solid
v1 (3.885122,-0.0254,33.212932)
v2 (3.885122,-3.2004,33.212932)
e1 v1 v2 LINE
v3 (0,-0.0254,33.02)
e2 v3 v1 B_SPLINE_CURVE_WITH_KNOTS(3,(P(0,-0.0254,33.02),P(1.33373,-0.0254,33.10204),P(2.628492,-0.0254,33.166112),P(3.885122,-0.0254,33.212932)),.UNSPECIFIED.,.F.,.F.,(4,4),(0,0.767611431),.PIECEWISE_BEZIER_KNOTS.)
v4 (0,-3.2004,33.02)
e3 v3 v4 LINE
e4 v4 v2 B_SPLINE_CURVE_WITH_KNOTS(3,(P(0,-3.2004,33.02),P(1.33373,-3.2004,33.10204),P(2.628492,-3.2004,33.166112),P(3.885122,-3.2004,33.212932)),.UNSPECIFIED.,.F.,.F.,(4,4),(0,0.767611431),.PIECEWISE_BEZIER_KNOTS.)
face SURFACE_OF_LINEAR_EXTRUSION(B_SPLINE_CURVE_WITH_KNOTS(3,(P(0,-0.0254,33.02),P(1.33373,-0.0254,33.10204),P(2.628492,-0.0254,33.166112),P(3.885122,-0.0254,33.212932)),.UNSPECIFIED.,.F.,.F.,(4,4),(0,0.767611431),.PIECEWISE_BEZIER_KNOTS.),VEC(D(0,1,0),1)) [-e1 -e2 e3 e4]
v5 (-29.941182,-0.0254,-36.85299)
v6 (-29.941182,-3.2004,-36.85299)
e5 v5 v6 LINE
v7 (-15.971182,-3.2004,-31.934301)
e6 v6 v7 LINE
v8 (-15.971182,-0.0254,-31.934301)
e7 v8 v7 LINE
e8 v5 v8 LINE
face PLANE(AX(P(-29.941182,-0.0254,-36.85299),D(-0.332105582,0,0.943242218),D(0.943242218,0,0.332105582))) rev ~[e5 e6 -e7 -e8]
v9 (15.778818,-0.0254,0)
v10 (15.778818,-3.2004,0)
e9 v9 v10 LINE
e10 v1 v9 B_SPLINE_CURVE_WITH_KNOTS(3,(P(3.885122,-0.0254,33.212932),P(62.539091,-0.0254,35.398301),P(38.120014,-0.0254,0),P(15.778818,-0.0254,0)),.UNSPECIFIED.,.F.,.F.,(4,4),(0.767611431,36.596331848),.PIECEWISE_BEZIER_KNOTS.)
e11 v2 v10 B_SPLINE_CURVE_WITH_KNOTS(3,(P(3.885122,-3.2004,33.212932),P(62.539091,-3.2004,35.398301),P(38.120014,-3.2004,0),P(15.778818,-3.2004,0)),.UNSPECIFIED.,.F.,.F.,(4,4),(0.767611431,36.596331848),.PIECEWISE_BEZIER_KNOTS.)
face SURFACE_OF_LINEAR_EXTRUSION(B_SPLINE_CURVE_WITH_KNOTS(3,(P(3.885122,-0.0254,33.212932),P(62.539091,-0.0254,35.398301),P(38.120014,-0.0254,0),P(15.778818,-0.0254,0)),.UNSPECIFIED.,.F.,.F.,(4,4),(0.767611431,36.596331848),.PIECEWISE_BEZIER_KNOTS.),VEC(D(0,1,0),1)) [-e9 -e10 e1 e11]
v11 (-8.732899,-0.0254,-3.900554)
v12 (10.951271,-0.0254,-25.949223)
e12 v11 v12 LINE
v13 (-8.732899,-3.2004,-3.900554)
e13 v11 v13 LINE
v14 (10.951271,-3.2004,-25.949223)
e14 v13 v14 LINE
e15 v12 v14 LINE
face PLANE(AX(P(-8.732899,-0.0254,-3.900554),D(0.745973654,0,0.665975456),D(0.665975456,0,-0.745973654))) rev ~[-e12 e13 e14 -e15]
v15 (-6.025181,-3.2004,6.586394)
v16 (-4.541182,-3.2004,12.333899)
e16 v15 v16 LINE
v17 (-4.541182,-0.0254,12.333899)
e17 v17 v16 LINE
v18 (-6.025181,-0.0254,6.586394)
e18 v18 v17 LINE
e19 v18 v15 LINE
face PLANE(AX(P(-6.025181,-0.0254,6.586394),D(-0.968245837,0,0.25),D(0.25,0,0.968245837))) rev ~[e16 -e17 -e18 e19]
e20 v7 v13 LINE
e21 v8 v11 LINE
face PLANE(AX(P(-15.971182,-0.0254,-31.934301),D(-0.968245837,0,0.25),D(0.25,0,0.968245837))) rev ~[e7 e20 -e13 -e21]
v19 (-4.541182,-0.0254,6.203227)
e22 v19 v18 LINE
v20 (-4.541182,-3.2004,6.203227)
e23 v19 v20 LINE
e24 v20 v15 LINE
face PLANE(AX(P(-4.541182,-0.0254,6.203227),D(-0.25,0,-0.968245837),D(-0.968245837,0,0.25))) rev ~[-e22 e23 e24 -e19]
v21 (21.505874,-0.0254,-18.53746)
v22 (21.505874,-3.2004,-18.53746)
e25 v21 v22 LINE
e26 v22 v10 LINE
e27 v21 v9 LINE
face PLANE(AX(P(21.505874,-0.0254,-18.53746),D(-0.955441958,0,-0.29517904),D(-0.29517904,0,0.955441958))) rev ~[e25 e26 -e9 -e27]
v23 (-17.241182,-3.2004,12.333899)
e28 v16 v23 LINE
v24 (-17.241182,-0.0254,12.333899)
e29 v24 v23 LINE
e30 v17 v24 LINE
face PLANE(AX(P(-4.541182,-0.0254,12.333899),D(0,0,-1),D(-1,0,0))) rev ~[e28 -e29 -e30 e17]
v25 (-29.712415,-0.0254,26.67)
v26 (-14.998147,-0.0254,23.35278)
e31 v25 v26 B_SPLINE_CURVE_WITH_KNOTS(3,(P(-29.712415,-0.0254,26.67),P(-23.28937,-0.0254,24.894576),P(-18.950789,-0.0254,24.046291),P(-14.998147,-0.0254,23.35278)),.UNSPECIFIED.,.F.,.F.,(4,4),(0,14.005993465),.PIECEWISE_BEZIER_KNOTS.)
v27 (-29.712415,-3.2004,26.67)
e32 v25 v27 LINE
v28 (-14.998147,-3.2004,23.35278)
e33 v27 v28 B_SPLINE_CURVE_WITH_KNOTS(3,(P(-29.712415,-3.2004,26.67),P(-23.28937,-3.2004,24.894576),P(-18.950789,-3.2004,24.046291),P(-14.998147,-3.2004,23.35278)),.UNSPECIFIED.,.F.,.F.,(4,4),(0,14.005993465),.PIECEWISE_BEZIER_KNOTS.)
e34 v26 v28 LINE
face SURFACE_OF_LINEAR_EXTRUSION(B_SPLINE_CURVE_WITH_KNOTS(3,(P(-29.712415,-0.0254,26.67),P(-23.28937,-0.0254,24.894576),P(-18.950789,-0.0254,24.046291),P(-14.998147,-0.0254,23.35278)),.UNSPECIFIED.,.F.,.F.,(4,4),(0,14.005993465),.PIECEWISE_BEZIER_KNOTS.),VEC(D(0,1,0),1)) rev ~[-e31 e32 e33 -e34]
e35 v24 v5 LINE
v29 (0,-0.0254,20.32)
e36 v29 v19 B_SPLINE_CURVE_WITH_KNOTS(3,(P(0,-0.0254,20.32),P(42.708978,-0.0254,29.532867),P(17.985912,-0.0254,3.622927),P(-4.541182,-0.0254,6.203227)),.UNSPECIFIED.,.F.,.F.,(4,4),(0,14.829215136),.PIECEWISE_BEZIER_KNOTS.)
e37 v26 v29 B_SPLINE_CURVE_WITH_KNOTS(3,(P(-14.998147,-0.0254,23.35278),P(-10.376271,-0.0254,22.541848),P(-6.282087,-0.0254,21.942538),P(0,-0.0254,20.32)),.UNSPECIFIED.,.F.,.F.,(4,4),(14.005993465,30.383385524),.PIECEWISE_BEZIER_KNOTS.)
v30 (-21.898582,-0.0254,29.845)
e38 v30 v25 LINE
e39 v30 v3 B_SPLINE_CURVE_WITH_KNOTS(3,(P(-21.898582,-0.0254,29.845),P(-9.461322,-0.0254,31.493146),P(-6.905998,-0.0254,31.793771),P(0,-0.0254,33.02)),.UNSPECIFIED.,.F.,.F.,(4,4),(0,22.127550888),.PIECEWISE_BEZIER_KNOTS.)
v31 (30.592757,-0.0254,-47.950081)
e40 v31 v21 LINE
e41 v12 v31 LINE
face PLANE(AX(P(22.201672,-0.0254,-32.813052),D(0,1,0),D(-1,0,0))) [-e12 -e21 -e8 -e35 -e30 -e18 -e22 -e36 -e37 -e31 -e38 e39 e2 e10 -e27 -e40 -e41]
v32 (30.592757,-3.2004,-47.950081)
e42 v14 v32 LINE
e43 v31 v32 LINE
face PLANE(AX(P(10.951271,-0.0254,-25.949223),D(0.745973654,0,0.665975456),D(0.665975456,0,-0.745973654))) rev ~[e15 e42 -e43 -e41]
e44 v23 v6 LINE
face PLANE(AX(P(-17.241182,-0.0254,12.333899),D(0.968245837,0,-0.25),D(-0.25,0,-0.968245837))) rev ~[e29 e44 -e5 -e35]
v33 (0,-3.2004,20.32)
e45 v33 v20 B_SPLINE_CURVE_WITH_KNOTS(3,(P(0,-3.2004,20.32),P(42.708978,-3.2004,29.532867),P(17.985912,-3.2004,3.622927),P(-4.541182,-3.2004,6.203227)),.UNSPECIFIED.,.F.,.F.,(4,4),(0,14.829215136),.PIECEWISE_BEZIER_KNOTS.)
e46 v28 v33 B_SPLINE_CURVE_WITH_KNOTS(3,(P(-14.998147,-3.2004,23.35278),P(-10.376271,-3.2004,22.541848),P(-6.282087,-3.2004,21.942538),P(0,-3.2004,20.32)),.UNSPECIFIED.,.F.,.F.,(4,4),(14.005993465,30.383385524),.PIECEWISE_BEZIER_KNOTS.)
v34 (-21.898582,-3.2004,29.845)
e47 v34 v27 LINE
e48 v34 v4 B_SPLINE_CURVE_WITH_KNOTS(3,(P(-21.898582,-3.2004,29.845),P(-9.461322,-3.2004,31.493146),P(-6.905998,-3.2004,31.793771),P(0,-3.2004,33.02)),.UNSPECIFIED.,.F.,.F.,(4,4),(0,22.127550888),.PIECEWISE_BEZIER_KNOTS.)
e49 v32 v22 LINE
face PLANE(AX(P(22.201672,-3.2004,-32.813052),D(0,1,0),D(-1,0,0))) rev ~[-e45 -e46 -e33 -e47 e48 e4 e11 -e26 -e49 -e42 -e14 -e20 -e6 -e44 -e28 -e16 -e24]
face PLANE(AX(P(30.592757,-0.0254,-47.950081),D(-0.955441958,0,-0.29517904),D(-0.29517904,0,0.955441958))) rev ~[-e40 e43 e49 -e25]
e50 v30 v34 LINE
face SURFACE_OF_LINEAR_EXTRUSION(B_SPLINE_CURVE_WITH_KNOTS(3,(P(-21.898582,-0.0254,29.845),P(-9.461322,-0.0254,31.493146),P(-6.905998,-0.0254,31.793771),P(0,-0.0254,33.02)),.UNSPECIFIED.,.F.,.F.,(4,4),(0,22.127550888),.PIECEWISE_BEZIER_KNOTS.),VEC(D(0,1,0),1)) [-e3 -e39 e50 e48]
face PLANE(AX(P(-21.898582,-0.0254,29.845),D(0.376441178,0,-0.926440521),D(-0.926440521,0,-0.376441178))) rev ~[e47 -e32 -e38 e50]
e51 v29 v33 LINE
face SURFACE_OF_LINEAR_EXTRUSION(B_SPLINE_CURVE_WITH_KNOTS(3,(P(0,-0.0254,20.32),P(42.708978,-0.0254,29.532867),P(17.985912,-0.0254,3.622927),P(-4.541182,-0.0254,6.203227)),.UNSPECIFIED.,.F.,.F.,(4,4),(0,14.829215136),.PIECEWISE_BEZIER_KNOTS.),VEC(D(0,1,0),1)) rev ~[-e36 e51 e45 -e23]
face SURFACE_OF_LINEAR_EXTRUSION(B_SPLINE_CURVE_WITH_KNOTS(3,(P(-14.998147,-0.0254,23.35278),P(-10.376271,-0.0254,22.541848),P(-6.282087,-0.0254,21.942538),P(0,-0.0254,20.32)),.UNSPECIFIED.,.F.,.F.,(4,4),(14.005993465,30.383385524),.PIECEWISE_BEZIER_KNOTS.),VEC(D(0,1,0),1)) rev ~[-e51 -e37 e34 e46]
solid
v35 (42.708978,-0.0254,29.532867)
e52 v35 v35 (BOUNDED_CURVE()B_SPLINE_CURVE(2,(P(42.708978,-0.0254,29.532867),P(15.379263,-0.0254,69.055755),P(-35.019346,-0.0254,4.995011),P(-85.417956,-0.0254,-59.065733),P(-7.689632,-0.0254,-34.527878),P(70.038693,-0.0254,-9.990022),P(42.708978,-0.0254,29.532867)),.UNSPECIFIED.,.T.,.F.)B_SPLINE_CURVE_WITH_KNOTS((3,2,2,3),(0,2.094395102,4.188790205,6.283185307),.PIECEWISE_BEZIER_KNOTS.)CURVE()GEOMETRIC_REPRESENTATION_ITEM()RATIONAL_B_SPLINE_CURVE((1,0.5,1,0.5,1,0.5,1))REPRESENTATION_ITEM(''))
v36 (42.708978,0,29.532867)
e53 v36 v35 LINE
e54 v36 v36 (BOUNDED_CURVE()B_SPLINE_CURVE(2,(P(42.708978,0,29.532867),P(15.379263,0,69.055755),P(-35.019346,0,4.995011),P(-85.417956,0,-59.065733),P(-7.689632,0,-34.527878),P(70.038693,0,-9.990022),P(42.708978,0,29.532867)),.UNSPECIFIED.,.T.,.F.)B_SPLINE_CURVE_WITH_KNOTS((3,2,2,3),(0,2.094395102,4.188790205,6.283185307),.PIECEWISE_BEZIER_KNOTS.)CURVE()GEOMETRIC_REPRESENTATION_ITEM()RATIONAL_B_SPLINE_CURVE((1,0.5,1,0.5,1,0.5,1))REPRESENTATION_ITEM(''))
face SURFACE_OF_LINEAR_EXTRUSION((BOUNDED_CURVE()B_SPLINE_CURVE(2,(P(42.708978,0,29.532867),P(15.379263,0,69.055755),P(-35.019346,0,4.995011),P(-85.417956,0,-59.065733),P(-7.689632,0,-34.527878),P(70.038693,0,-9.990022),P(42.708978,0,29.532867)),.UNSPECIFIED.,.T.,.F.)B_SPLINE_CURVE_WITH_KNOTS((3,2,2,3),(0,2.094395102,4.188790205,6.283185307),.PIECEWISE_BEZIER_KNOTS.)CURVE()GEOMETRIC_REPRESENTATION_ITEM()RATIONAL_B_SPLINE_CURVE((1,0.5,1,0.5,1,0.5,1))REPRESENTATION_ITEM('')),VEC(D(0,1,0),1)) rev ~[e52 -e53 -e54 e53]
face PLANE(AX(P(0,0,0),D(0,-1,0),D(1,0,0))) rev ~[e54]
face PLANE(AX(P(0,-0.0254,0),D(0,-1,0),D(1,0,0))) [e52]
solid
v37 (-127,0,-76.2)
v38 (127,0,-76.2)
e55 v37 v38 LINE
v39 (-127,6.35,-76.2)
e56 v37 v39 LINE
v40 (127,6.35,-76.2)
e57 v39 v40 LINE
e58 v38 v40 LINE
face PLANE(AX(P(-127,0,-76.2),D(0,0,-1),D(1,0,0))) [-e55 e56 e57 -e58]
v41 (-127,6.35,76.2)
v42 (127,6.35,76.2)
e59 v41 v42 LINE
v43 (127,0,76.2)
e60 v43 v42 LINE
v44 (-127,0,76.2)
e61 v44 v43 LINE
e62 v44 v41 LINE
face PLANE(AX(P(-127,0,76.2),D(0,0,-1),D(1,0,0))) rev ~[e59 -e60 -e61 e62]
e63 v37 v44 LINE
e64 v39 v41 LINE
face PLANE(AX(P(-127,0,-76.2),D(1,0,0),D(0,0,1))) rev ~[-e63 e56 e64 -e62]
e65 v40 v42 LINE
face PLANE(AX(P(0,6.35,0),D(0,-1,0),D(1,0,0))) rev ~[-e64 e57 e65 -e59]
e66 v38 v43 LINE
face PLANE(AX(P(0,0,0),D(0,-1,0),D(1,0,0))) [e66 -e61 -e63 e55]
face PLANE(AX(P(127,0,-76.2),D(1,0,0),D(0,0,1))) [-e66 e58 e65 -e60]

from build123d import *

# Parameters (mm, degrees)
F0_W     = 254
F0_H     = 152.4
F1_DEPTH = 6.35
F3_DEPTH = 0.0254
F5_DEPTH = 3.175


# Not quite as in the source:
# - a feature names something its author has since deleted; it is built from what else it names


with BuildPart() as f1:
    # F0 (on Front) → F1 (new body)
    with BuildSketch(Plane.XZ):
        Rectangle(F0_W, F0_H)
    extrude(amount=-F1_DEPTH)


with BuildPart() as f3:
    # F2 (on face) → F3 (new body)
    with BuildSketch(Plane.XZ):
        with BuildLine():
            add(Edge.make_bspline(
                [(42.7089780569, 29.5328665525), (15.3792632005, 69.0557550614), (-35.0193464566, 4.9950109782), (-85.4179561138, -59.0657331049), (-7.6896316003, -34.5278775307), (70.0386929133, -9.9900219565), (42.7089780569, 29.5328665525)],
                knots=[0, 0, 0, 2.0943951024, 2.0943951024, 4.1887902048, 4.1887902048, 6.2831853072, 6.2831853072, 6.2831853072], degree=2, weights=[1, 0.5, 1, 0.5, 1, 0.5, 1]))
        make_face()
    extrude(amount=F3_DEPTH)


with BuildPart() as f5:
    # F4 (on face) → F5 (new body)
    with BuildSketch(Plane.XZ.offset(0.0254)):
        with BuildLine():
            add(Edge.make_bspline(
                [(10.9512705407, -25.9492226202), (16.4828155374, -22.5918140848), (21.5058742199, -18.537459797)],
                knots=[4.6403572647, 4.6403572647, 4.6403572647, 4.8819348749, 4.8819348749, 4.8819348749], degree=2, weights=[0.8308791571, 0.7980759448, 0.7785771582]))
            Line((10.9512705407, -25.9492226202), (30.5927571669, -47.9500807992))
            Line((30.5927571669, -47.9500807992), (21.5058742199, -18.537459797))
        make_face()
        with BuildLine():
            Line((0, 33.02), (0, 31.6392348733))
            add(Edge.make_bspline(
                [(3.8851219863, 33.2129324059), (1.946109979, 32.4853248752), (0, 31.6392348733)],
                knots=[1.1236663731, 1.1236663731, 1.1236663731, 1.2014715695, 1.2014715695, 1.2014715695], degree=2, weights=[0.7513330658, 0.7526894283, 0.7554258571]))
            add(Edge.make_bspline(
                [(0, 33.02), (1.3337301063, 33.1020404773), (2.6284916435, 33.1661120443), (3.8851219863, 33.2129324059)],
                knots=[0, 0, 0, 0, 0.7676114314, 0.7676114314, 0.7676114314, 0.7676114314], degree=3))
        make_face()
        with BuildLine():
            Line((-8.7328994515, -3.9005538706), (10.9512705407, -25.9492226202))
            add(Edge.make_bspline(
                [(10.9512705407, -25.9492226202), (16.4828155374, -22.5918140848), (21.5058742199, -18.537459797)],
                knots=[4.6403572647, 4.6403572647, 4.6403572647, 4.8819348749, 4.8819348749, 4.8819348749], degree=2, weights=[0.8308791571, 0.7980759448, 0.7785771582]))
            Line((21.5058742199, -18.537459797), (15.7788182292, 0))
            add(Edge.make_bspline(
                [(3.8851219863, 33.2129324059), (62.53909114, 35.3983006502), (38.1200136526, 0), (15.7788182292, 0)],
                knots=[0.7676114314, 0.7676114314, 0.7676114314, 0.7676114314, 36.5963318477, 36.5963318477, 36.5963318477, 36.5963318477], degree=3))
            add(Edge.make_bspline(
                [(3.8851219863, 33.2129324059), (1.946109979, 32.4853248752), (0, 31.6392348733)],
                knots=[1.1236663731, 1.1236663731, 1.1236663731, 1.2014715695, 1.2014715695, 1.2014715695], degree=2, weights=[0.7513330658, 0.7526894283, 0.7554258571]))
            Line((0, 31.6392348733), (0, 20.32))
            add(Edge.make_bspline(
                [(0, 20.32), (42.7089780569, 29.5328665525), (17.9859120399, 3.6229274701), (-4.5411817708, 6.2032266552)],
                knots=[0, 0, 0, 0, 14.8292151358, 14.8292151358, 14.8292151358, 14.8292151358], degree=3))
            Line((-4.5411817708, 6.2032266552), (-6.0251812396, 6.5863936705))
            Line((-6.0251812396, 6.5863936705), (-8.7328994515, -3.9005538706))
        make_face()
        Polygon((-17.2411817708, 12.3338988988), (-29.9411817708, -36.852989598), (-15.9711817708, -31.9343007483), (-8.7328994515, -3.9005538706), (-6.0251812396, 6.5863936705), (-4.5411817708, 12.3338988988), align=None)
        with BuildLine():
            add(Edge.make_bspline(
                [(0, 31.6392348733), (-7.71435254, 28.2853460255), (-14.9981473119, 23.3527795901)],
                knots=[1.2014715695, 1.2014715695, 1.2014715695, 1.5155376104, 1.5155376104, 1.5155376104], degree=2, weights=[0.7554258571, 0.7664716411, 0.8000040736]))
            add(Edge.make_bspline(
                [(-14.9981473119, 23.3527795901), (-10.3762713203, 22.5418478133), (-6.2820866899, 21.9425380061), (0, 20.32)],
                knots=[14.0059934649, 14.0059934649, 14.0059934649, 14.0059934649, 30.3833855243, 30.3833855243, 30.3833855243, 30.3833855243], degree=3))
            Line((0, 20.32), (0, 31.6392348733))
        make_face()
        with BuildLine():
            add(Edge.make_bspline(
                [(-29.7124151815, 26.67), (-23.2893696753, 24.8945764216), (-18.9507891427, 24.0462908112), (-14.9981473119, 23.3527795901)],
                knots=[0, 0, 0, 0, 14.0059934649, 14.0059934649, 14.0059934649, 14.0059934649], degree=3))
            add(Edge.make_bspline(
                [(0, 31.6392348733), (-7.71435254, 28.2853460255), (-14.9981473119, 23.3527795901)],
                knots=[1.2014715695, 1.2014715695, 1.2014715695, 1.5155376104, 1.5155376104, 1.5155376104], degree=2, weights=[0.7554258571, 0.7664716411, 0.8000040736]))
            Line((0, 31.6392348733), (0, 33.02))
            add(Edge.make_bspline(
                [(-21.8985817649, 29.845), (-9.461321868, 31.493146081), (-6.9059981033, 31.7937714201), (0, 33.02)],
                knots=[0, 0, 0, 0, 22.1275508883, 22.1275508883, 22.1275508883, 22.1275508883], degree=3))
            Line((-21.8985817649, 29.845), (-29.7124151815, 26.67))
        make_face()
    extrude(amount=F5_DEPTH)


solid = Compound([f1.part, f3.part, f5.part])
